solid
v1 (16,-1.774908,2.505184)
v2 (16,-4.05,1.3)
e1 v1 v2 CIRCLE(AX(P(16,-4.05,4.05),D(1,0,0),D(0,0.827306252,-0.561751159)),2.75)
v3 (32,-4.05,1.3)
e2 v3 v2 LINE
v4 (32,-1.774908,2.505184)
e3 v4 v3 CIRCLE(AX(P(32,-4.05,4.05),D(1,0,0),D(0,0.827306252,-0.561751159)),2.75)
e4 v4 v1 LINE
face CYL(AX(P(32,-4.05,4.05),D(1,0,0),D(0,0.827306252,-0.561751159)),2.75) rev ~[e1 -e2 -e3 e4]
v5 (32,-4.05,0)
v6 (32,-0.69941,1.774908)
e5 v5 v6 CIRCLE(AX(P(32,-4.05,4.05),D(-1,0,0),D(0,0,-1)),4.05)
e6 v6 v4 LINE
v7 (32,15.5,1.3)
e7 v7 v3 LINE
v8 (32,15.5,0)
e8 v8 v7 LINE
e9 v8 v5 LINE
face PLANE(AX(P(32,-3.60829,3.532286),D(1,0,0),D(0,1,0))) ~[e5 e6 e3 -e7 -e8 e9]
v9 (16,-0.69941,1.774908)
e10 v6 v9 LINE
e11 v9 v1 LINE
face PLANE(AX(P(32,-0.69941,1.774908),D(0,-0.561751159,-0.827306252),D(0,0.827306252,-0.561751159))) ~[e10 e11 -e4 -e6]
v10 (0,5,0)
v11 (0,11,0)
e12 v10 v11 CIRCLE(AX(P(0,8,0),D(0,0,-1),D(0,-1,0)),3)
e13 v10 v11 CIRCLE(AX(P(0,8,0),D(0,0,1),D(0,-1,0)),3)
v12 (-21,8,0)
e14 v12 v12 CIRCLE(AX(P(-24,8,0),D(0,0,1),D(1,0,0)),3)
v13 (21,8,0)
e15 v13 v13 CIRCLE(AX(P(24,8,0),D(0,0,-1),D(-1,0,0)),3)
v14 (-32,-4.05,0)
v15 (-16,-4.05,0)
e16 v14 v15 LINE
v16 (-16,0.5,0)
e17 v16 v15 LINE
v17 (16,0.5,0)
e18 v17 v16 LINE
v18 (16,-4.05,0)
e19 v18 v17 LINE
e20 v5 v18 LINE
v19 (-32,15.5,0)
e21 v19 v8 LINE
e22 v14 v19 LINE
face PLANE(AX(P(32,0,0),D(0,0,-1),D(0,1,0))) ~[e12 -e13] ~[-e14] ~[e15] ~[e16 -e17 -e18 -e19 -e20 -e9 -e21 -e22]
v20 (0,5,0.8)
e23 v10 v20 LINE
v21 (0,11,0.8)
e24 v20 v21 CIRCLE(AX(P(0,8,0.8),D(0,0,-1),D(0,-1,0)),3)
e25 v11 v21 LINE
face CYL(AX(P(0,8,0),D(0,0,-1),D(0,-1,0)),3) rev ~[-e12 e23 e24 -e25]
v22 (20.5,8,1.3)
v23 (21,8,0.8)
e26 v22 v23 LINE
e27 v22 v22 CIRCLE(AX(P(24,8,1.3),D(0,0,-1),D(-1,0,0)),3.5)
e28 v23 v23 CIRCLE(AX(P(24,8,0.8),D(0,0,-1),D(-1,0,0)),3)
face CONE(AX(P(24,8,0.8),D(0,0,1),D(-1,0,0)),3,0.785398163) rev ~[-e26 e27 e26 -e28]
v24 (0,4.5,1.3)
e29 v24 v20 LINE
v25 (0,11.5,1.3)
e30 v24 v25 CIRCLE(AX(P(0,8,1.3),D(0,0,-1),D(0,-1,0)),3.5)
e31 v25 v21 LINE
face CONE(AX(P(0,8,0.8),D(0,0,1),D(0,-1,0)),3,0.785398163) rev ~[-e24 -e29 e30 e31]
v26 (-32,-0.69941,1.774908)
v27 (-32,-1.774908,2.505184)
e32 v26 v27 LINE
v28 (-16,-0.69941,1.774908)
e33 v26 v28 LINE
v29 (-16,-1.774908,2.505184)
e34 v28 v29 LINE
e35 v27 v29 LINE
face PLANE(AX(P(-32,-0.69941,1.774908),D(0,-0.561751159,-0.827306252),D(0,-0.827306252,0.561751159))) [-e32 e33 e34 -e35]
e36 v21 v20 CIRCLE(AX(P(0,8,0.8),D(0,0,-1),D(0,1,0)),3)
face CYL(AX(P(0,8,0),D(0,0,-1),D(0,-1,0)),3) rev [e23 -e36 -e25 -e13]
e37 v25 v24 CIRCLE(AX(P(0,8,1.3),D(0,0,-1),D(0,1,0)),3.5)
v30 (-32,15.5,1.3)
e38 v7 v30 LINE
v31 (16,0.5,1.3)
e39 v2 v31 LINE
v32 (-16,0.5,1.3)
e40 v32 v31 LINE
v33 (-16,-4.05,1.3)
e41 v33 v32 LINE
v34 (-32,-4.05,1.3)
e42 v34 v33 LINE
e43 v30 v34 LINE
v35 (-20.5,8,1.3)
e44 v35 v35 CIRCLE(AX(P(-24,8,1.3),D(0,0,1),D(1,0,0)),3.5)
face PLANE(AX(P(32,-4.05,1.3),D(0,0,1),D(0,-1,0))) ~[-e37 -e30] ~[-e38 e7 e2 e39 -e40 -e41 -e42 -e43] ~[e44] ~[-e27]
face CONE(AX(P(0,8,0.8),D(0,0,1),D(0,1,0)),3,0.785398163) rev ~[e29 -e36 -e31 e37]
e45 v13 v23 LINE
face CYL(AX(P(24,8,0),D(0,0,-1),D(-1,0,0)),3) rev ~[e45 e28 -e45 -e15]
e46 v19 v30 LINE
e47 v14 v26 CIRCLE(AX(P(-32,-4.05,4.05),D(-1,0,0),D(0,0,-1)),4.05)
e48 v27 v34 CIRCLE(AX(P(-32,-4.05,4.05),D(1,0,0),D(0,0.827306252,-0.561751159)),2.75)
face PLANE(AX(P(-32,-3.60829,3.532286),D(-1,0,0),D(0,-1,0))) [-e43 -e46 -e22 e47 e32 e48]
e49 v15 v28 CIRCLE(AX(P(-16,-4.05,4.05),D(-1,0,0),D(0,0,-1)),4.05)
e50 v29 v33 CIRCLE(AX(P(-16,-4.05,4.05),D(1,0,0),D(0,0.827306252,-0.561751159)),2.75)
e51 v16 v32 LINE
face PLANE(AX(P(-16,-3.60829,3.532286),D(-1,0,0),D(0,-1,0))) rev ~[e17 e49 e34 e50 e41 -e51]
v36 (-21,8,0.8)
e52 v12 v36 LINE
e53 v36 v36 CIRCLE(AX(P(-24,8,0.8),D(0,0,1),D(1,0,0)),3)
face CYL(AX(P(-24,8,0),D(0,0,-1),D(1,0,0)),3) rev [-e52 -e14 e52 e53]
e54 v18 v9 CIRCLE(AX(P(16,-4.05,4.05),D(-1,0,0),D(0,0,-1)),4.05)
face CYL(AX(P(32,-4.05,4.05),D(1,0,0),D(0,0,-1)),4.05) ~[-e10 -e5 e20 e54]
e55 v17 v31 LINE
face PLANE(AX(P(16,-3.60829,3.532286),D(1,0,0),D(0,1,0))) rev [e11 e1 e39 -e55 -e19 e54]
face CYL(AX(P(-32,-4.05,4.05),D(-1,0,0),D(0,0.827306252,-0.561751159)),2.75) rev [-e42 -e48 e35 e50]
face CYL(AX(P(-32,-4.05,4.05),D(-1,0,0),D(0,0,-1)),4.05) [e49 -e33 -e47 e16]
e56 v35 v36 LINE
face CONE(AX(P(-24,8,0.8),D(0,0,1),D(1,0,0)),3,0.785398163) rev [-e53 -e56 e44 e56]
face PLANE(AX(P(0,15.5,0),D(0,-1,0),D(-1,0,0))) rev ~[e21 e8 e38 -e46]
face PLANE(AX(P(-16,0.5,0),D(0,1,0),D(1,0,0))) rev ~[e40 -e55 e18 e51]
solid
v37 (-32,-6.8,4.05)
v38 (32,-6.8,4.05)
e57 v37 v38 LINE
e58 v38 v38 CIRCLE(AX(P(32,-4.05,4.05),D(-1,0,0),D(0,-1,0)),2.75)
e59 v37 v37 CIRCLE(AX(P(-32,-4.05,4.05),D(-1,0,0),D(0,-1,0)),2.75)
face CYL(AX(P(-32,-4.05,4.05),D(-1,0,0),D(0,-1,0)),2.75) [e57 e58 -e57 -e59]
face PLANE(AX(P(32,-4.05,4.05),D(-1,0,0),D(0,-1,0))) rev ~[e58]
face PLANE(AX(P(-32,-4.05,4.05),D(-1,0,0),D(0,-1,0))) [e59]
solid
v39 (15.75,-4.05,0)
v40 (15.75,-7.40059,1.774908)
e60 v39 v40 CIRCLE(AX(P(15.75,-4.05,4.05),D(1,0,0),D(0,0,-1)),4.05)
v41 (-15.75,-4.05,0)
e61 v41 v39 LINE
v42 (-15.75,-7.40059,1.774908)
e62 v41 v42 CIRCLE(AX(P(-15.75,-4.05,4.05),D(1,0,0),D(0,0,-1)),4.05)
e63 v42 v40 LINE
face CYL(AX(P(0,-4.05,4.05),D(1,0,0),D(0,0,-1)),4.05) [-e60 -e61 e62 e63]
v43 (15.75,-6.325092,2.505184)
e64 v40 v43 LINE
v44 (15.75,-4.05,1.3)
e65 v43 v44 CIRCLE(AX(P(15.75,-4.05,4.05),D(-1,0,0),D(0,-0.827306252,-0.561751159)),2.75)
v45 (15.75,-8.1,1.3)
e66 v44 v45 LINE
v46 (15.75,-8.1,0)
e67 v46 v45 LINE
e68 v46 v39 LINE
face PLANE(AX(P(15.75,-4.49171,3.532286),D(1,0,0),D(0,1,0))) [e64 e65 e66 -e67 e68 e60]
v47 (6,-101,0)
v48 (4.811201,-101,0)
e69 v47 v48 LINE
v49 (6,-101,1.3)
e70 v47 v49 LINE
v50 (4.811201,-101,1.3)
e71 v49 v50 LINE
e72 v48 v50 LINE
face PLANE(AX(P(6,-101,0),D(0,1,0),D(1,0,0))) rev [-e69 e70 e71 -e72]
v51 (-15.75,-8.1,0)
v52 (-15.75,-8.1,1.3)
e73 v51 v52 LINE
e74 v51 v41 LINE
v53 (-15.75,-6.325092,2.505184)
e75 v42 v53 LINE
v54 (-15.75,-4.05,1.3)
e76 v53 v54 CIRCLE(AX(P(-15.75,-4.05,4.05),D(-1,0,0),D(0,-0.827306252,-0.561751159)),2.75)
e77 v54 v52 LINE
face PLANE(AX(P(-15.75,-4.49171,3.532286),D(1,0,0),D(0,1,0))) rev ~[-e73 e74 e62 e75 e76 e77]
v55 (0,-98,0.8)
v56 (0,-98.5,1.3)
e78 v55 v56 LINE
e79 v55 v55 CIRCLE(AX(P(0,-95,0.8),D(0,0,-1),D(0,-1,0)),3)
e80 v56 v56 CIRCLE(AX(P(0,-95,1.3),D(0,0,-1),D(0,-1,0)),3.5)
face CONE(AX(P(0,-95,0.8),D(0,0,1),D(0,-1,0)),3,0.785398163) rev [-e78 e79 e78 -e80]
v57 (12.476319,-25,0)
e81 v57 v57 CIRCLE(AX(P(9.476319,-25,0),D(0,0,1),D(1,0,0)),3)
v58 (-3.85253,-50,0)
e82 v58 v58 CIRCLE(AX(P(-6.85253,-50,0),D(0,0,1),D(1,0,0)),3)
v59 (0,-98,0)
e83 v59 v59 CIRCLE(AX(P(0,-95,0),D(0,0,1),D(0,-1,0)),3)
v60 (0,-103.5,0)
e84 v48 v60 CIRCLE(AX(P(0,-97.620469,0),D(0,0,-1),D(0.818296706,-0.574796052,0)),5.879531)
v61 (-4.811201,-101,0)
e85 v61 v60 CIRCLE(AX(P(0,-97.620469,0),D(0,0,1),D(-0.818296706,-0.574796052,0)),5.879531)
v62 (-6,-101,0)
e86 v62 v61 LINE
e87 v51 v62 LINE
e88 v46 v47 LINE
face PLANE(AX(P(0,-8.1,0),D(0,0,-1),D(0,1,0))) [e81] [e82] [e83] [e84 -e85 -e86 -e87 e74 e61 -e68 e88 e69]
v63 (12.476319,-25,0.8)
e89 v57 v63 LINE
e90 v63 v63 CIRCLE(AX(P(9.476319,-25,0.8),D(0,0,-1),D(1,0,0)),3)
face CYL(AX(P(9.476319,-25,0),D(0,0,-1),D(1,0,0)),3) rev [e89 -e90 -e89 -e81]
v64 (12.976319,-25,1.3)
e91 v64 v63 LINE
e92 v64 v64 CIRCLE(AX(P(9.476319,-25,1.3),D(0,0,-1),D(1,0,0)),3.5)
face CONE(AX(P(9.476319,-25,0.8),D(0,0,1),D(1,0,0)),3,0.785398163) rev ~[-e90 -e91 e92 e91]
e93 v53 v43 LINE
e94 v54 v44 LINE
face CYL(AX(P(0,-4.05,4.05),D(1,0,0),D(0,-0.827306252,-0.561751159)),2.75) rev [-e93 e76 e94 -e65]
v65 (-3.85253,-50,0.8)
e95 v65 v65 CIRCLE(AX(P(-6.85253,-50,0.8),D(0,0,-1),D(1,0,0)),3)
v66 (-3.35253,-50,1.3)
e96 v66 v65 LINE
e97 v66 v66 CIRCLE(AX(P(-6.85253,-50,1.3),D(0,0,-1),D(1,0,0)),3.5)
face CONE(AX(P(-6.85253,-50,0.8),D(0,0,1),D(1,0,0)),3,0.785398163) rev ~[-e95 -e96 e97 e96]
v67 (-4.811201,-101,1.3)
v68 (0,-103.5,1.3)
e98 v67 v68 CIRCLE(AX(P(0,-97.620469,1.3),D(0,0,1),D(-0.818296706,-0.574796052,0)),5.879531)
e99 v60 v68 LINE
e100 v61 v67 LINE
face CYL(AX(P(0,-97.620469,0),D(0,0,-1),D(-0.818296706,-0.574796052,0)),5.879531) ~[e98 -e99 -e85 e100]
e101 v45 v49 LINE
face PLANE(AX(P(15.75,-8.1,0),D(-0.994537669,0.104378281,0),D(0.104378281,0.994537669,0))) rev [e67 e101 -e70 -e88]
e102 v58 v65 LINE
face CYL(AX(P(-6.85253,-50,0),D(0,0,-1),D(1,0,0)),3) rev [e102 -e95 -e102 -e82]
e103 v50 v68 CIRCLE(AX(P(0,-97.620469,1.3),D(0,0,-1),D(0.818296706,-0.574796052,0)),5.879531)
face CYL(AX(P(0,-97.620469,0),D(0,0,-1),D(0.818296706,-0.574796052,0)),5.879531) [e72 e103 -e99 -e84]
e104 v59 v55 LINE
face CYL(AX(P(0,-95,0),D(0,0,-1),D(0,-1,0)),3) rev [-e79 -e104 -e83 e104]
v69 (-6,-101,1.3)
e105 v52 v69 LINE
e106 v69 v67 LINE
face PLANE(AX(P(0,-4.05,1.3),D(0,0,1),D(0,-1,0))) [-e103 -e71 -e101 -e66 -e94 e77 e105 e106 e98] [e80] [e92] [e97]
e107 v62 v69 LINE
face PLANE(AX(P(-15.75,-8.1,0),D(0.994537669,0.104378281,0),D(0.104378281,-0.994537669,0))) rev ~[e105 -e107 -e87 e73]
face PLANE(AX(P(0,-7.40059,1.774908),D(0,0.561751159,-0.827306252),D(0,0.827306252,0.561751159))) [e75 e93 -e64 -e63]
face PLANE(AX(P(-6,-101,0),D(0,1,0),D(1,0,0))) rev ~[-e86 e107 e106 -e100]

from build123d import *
from build123d import SkipClean  # not in build123d's __all__

# Parameters (mm, degrees)
F0_R          = 3
F1_DEPTH      = 1.3
F2_DEPTH      = 1.3
F5_DEPTH      = 1.301
F7_DEPTH      = 15.75
F7_DEPTH_BACK = 15.75
F9_DEPTH      = 16
F11_R         = 2.75
F12_DEPTH     = 64
F13_SIZE      = 0.5
F13_2_SIZE    = 0.5


with BuildPart() as f1:
    # F0 (on Top) → F1 (new body)
    with BuildSketch(Plane.XY):
        with BuildLine():
            Line((0, 15.5), (-32, 15.5))
            Line((-32, 15.5), (-32, 0))
            Line((-32, 0), (-16, 0))
            Line((-16, 0), (-16, 0.5))
            Line((-16, 0.5), (0, 0.5))
            Line((0, 0.5), (0, 5))
            ThreePointArc((0, 5), (-3, 8), (0, 11))
            Line((0, 11), (0, 15.5))
        make_face()
        with Locations((-24, 8)):
            Circle(F0_R, mode=Mode.SUBTRACT)
    extrude(amount=F1_DEPTH)

    # F3: F1 across face


with BuildPart() as f2:
    # F0 (on Top) → F2 (new body)
    with BuildSketch(Plane.XY):
        with BuildLine():
            Line((0, -92), (0, -8.1))
            Line((0, -8.1), (-15.75, -8.1))
            Line((-15.75, -8.1), (-6, -101))
            Line((-6, -101), (-4.8112012446, -101))
            ThreePointArc((-4.8112012446, -101), (-2.7109803308, -102.8376972935), (0, -103.5))
            Line((0, -103.5), (0, -98))
            ThreePointArc((0, -98), (-3, -95), (0, -92))
        make_face()
        with Locations((-6.8525296017, -50)):
            Circle(F0_R, mode=Mode.SUBTRACT)
        with Locations((-6.8525296017, -50)):
            Circle(F0_R)
    extrude(amount=F2_DEPTH)

    # F4: F2 across face


with BuildPart() as f1_1:
    add(f1.part, clean=False)
    with SkipClean():  # cleaning this boolean's faces spoils the solid; the shape is the same uncleaned
        add(f1.part.mirror(Plane(origin=(0, -50.05, 0.65), x_dir=(0, 1, 0), z_dir=(1, 0, 0))), clean=False)

    # F8 (on face) → F9 (join, through all)
    with BuildSketch(Plane(origin=(-32, 0, 0), x_dir=(0, -1, 0), z_dir=(-1, 0, 0))):
        with BuildLine():
            Line((0, 0), (4.05, 0))
            ThreePointArc((4.05, 0), (5.9458344619, 7.6288701699), (0.6994096777, 1.7749078058))
            Line((0.6994096777, 1.7749078058), (1.7749078058, 2.5051843126))
            ThreePointArc((1.7749078058, 2.5051843126), (5.337295005, 6.480097029), (4.05, 1.3))
            Line((4.05, 1.3), (0, 1.3))
            Line((0, 1.3), (0, 0))
        make_face()
    extrude(amount=-F9_DEPTH)

    # F10: F1 across plane


with BuildPart() as f2_1:
    add(f2.part, clean=False)
    with SkipClean():  # cleaning this boolean's faces spoils the solid; the shape is the same uncleaned
        add(f2.part.mirror(Plane(origin=(0, -50.05, 0.65), x_dir=(0, 1, 0), z_dir=(1, 0, 0))), clean=False)

    # F0 (on Top) → F5 (cut, through all)
    with BuildSketch(Plane.XY):
        with Locations((9.4763186222, -25)):
            Circle(F0_R)
        with Locations((-6.8525296017, -50)):
            Circle(F0_R)
    extrude(amount=F5_DEPTH, mode=Mode.SUBTRACT)

    # F6 (on Right) → F7 (join, two sides)
    with BuildSketch(Plane.YZ) as f7_sk:
        with BuildLine():
            Line((-8.1, 0), (-4.05, 0))
            ThreePointArc((-4.05, 0), (-2.1541655381, 7.6288701699), (-7.4005903223, 1.7749078058))
            Line((-7.4005903223, 1.7749078058), (-6.3250921942, 2.5051843126))
            ThreePointArc((-6.3250921942, 2.5051843126), (-2.762704995, 6.480097029), (-4.05, 1.3))
            Line((-4.05, 1.3), (-8.1, 1.3))
            Line((-8.1, 1.3), (-8.1, 0))
        make_face()
    extrude(amount=F7_DEPTH)
    extrude(f7_sk.sketch, amount=-F7_DEPTH_BACK)

    # F13#2
    f13_2_edges = [f2_1.edges().sort_by_distance(p)[0] for p in [
        (6.476319, -25, 1.3),
        (-9.85253, -50, 1.3),
        (-3, -95, 1.3),
        (3, -95, 1.3),
    ]]
    chamfer(f13_2_edges, length=F13_2_SIZE)


with BuildPart() as f1_2:
    add(f1_1.part, clean=False)
    add(f1_1.part.mirror(Plane.YZ), clean=False)

    # F13
    f13_edges = [f1_2.edges().sort_by_distance(p)[0] for p in [
        (27, 8, 1.3),
        (-3, 8, 1.3),
        (3, 8, 1.3),
        (-27, 8, 1.3),
    ]]
    chamfer(f13_edges, length=F13_SIZE)


with BuildPart() as f12:
    # F11 (on face) → F12 (new body, through all)
    with BuildSketch(Plane(origin=(-32, 0, 0), x_dir=(0, -1, 0), z_dir=(-1, 0, 0))):
        with Locations((4.05, 4.05)):
            Circle(F11_R)
    extrude(amount=-F12_DEPTH)


solid = Compound([f2_1.part, f1_2.part, f12.part])
